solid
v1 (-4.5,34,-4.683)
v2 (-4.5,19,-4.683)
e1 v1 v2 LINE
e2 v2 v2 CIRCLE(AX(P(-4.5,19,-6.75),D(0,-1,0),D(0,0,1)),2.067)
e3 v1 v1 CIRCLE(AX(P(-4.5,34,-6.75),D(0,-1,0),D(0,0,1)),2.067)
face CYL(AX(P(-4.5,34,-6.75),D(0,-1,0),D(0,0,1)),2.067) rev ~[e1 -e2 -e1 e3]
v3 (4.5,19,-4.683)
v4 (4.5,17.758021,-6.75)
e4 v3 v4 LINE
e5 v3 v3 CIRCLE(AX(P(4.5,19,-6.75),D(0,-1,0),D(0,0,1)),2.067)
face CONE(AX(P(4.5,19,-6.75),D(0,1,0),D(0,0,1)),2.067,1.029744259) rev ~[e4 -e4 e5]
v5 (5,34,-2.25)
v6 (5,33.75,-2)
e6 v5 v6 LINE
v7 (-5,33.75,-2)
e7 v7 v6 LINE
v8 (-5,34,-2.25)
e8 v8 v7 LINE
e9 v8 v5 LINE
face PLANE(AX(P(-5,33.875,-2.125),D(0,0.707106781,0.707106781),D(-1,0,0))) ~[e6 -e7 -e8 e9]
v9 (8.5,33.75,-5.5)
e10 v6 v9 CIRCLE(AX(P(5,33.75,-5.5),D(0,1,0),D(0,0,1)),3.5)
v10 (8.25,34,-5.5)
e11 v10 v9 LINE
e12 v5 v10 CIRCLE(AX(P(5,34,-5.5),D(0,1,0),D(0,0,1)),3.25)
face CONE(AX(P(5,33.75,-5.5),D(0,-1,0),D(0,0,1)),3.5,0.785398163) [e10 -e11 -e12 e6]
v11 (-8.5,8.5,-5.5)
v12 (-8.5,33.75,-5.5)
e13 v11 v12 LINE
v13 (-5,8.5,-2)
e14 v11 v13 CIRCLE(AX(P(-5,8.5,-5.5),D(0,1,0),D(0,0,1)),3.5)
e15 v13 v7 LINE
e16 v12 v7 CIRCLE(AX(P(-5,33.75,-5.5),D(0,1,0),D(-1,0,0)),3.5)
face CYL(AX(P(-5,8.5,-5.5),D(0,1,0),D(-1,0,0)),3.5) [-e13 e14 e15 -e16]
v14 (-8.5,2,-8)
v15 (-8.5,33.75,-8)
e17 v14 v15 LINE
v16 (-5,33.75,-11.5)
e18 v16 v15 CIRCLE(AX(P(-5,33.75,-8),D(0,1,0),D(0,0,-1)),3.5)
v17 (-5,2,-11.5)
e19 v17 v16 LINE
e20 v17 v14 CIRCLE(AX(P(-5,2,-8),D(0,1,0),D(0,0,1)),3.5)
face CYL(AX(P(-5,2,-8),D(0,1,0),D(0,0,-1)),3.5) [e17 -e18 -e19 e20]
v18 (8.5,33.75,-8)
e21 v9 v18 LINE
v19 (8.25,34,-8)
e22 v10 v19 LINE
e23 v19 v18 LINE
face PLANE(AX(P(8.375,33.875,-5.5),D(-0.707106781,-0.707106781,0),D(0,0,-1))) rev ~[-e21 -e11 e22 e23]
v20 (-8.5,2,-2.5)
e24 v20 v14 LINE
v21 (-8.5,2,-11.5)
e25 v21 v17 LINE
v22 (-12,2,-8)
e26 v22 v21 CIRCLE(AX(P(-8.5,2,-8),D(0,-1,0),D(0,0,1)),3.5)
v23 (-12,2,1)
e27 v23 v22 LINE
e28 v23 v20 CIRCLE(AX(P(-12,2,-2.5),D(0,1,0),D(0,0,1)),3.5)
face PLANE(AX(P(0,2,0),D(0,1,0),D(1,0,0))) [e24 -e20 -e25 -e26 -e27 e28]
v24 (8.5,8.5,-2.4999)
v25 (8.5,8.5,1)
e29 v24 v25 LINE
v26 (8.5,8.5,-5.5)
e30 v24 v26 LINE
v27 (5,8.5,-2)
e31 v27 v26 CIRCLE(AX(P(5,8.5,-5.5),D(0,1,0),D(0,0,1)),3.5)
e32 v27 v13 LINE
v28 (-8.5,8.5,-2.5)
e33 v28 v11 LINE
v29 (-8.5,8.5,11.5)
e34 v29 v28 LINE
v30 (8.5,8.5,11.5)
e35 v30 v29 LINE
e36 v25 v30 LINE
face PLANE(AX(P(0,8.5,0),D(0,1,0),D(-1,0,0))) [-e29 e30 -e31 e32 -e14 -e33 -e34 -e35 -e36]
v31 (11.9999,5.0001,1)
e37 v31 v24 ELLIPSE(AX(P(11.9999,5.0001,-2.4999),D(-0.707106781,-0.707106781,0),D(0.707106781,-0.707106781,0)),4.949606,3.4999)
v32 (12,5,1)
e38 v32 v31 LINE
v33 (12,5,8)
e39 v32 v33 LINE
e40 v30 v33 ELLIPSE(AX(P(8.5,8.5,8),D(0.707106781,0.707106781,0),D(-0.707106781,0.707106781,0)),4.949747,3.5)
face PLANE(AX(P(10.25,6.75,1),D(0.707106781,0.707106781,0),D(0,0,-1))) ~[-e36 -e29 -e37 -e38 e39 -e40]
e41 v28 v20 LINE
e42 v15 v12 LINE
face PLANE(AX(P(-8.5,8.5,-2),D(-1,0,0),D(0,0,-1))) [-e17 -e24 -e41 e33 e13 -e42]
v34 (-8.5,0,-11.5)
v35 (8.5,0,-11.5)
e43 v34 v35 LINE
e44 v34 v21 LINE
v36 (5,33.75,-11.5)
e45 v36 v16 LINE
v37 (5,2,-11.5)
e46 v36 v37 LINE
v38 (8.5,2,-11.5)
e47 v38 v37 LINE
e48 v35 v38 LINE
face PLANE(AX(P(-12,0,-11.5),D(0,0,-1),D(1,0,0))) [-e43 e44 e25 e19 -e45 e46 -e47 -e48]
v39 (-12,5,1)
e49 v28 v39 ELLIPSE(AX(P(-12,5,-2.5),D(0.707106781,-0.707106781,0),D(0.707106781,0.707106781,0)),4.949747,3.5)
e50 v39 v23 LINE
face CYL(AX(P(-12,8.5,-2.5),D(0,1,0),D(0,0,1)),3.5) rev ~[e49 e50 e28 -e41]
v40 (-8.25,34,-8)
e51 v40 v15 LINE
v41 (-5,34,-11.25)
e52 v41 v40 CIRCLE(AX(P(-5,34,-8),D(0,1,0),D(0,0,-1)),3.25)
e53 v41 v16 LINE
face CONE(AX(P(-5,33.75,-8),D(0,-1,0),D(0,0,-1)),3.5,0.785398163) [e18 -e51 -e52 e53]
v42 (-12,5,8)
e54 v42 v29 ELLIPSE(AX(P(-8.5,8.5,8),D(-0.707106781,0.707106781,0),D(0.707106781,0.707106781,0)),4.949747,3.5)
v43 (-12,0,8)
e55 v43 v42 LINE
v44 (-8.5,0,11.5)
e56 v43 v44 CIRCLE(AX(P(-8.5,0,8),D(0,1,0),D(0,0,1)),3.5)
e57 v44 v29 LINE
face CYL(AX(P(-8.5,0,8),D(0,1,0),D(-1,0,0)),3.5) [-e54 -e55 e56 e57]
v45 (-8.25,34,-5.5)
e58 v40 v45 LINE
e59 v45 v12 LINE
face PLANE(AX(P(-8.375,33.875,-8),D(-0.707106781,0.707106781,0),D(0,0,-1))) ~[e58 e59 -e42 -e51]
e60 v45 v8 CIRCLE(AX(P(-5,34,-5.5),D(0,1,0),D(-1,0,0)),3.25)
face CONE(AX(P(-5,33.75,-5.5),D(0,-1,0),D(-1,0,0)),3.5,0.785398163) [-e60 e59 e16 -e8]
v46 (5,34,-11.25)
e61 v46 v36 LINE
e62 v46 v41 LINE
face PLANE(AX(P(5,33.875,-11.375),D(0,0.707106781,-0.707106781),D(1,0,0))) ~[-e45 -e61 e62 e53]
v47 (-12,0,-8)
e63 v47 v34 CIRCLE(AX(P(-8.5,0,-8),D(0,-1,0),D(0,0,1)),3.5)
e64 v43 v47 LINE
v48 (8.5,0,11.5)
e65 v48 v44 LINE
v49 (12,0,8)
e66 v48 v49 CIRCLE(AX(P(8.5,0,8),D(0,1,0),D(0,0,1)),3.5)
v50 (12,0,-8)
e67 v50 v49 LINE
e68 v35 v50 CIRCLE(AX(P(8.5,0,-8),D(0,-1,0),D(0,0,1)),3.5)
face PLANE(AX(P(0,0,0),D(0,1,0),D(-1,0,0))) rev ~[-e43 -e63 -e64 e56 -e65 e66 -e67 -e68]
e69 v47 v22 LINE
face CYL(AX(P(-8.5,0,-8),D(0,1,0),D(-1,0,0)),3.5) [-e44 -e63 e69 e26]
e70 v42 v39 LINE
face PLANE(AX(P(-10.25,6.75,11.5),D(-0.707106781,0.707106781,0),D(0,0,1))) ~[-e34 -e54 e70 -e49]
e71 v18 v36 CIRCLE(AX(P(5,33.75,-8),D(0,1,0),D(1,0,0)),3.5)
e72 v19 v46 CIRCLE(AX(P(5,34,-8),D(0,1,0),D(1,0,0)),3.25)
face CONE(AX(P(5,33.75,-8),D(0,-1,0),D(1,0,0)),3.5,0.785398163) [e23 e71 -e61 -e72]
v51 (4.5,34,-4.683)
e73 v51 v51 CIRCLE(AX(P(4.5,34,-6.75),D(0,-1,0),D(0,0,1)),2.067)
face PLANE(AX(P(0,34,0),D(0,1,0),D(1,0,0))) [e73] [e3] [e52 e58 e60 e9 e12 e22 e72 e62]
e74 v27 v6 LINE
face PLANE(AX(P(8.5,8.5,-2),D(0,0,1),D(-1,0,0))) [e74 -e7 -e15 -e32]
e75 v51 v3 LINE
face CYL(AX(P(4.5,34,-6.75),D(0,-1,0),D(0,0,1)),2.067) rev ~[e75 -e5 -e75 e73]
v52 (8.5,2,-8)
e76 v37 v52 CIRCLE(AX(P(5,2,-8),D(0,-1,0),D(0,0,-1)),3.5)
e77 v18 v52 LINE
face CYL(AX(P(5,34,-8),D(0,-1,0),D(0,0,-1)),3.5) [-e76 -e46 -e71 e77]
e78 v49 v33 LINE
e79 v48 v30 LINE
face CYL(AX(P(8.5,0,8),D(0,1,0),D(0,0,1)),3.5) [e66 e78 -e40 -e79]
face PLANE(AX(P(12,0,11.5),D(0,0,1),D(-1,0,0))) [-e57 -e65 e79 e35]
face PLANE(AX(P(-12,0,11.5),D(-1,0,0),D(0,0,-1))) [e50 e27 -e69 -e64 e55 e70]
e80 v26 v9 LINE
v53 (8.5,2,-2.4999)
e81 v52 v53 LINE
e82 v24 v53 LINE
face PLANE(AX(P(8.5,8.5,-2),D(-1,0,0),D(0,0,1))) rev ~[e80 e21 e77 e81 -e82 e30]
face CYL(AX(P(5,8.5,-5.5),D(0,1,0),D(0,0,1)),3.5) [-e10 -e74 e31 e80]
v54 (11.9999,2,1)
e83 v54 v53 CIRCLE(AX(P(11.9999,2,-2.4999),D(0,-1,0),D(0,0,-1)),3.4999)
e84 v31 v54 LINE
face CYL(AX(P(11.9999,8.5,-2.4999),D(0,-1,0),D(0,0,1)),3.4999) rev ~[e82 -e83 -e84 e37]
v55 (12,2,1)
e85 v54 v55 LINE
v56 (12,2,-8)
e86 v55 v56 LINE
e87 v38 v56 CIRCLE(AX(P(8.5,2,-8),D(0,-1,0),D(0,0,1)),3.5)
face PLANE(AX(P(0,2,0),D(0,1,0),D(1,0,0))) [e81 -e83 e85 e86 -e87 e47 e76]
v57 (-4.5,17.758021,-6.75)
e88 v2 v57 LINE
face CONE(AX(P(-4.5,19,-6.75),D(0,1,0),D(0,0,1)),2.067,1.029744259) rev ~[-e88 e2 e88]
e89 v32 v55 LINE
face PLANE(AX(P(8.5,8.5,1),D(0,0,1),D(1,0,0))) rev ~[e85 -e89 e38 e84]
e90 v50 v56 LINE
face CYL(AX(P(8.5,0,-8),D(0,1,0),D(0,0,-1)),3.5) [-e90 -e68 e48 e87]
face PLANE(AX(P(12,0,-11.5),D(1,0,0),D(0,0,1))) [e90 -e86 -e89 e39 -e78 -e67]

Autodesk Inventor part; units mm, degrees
ref_plane "YZ Plane" through (0, 0, 0) normal (1, 0, 0) x (0, 1, 0)
ref_plane "XZ Plane" through (0, 0, 0) normal (0, 1, 0) x (-1, 0, 0)
ref_plane "XY Plane" through (0, 0, 0) normal (0, 0, 1) x (1, 0, 0)
sketch "Base Outline" plane through (0, 0, 0) normal (0, 1, 0) x (-1, 0, 0)
  line L0 (12, -11.5) -> (-12, -11.5)
  line L1 (-12, -11.5) -> (-12, 11.5)
  line L2 (-12, 11.5) -> (12, 11.5)
  line L3 (12, 11.5) -> (12, -11.5)
  point P0 (0, 0)
  dimension "d0" = 23
  dimension "d1" = 11.5
  dimension "d2" = 24
  dimension "d3" = 12
extrude "Base" add sketch "Base Outline" along normal blind 8.5
sketch "Pillar Outline" plane through (0, 8.5, 0) normal (0, 1, 0) x (1, 0, 0)
  line L0 (-8.5, 11.5) -> (8.5, 11.5)
  line L1 (8.5, 11.5) -> (8.5, 2)
  line L2 (8.5, 2) -> (-8.5, 2)
  line L3 (-8.5, 2) -> (-8.5, 11.5)
  line L4 (12, 11.5) -> (-12, 11.5) projected
  point P0 (0, 0)
  dimension "d6" = 0
  dimension "d7" = 9.5
  dimension "d8" = 17
  dimension "d9" = 8.5
extrude "Pillar" add sketch "Pillar Outline" along normal blind 25.5
sketch "Base Cutouts Outline" plane through (0, 8.5, 0) normal (0, 1, 0) x (1, 0, 0)
  line L0 (-8.5, -1) -> (-12, -1)
  line L1 (-12, -1) -> (-12, 11.5)
  line L2 (-12, 11.5) -> (-8.5, 11.5)
  line L3 (-8.5, 11.5) -> (-8.5, -1)
  line L4 (8.5, -1) -> (12, -1)
  line L5 (12, -1) -> (12, 11.5)
  line L6 (12, 11.5) -> (8.5, 11.5)
  line L7 (8.5, 11.5) -> (8.5, -1)
  line L8 (-8.5, 11.5) -> (-12, 11.5) projected
  line L9 (-12, 11.5) -> (-12, -11.5) projected
  line L10 (-8.5, 11.5) -> (-8.5, 2) projected
  line L11 (8.5, 2) -> (8.5, 11.5) projected
  line L12 (12, 11.5) -> (8.5, 11.5) projected
  line L13 (12, -11.5) -> (12, 11.5) projected
  point P0 (0, 0)
  dimension "d12" = 0
  dimension "d13" = 0
  dimension "d14" = 0
  dimension "d15" = 12.5
  dimension "d16" = 0
  dimension "d17" = 0
  dimension "d18" = 0
  dimension "d19" = 12.5
extrude "Base Cutouts" cut sketch "Base Cutouts Outline" against normal blind 6.5
sketch "Hole Positions" plane through (0, 34, 0) normal (0, 1, 0) x (1, 0, 0)
  line L0 (8.5, 11.5) -> (-8.5, 11.5) projected
  point P0 (0, 0)
  point P1 (4.5, 6.75)
  point P2 (-4.5, 6.75)
  dimension "d22" = 4.75
  dimension "d23" = 4.5
  dimension "d24" = 4.5
  dimension "d25" = 4.75
hole "Holes" at (4.5, 34, -6.75) at (-4.5, 34, -6.75) direction (0, -1, 0) diameter 4.134 depth 15 tip angle 118 thread size "M5x0.8" class "6H" standard "ISO Metric profile"
chamfer "Base Chamfer" distance 3.5 angle 45 2 edges at (-12, 8.5, 6.25) (12, 8.5, 6.25)
fillet "Pillar Fillet" radius 3.5 10 edges at (-12, 1, -11.5) (-8.5, 18, -11.5) (-8.5, 21.25, -2) (8.5, 21.25, -2) (-8.5, 5.25, 1) (-12, 2.5, 11.5) (12, 2.5, 11.5) (8.5, 5.25, 1) (12, 1, -11.5) (8.5, 18, -11.5)
chamfer "Pillar Chamfer" distance 0.25 angle 45 8 edges at (-7.4749, 34, -3.0251) (-8.5, 34, -6.75) (-7.4749, 34, -10.4749) (0, 34, -11.5) (7.4749, 34, -10.4749) (8.5, 34, -6.75) (7.4749, 34, -3.0251) (0, 34, -2)
equation "\"d1\" = 0.5 * d0"
equation "\"d3\" = 0.5 * d2"
equation "\"d9\" = 0.5 * d8"
equation "\"d19\" = d15"
equation "\"d24\" = d23"
equation "\"d25\" = d22"
properties part number "LR Rail" material "Aluminum 6061"
